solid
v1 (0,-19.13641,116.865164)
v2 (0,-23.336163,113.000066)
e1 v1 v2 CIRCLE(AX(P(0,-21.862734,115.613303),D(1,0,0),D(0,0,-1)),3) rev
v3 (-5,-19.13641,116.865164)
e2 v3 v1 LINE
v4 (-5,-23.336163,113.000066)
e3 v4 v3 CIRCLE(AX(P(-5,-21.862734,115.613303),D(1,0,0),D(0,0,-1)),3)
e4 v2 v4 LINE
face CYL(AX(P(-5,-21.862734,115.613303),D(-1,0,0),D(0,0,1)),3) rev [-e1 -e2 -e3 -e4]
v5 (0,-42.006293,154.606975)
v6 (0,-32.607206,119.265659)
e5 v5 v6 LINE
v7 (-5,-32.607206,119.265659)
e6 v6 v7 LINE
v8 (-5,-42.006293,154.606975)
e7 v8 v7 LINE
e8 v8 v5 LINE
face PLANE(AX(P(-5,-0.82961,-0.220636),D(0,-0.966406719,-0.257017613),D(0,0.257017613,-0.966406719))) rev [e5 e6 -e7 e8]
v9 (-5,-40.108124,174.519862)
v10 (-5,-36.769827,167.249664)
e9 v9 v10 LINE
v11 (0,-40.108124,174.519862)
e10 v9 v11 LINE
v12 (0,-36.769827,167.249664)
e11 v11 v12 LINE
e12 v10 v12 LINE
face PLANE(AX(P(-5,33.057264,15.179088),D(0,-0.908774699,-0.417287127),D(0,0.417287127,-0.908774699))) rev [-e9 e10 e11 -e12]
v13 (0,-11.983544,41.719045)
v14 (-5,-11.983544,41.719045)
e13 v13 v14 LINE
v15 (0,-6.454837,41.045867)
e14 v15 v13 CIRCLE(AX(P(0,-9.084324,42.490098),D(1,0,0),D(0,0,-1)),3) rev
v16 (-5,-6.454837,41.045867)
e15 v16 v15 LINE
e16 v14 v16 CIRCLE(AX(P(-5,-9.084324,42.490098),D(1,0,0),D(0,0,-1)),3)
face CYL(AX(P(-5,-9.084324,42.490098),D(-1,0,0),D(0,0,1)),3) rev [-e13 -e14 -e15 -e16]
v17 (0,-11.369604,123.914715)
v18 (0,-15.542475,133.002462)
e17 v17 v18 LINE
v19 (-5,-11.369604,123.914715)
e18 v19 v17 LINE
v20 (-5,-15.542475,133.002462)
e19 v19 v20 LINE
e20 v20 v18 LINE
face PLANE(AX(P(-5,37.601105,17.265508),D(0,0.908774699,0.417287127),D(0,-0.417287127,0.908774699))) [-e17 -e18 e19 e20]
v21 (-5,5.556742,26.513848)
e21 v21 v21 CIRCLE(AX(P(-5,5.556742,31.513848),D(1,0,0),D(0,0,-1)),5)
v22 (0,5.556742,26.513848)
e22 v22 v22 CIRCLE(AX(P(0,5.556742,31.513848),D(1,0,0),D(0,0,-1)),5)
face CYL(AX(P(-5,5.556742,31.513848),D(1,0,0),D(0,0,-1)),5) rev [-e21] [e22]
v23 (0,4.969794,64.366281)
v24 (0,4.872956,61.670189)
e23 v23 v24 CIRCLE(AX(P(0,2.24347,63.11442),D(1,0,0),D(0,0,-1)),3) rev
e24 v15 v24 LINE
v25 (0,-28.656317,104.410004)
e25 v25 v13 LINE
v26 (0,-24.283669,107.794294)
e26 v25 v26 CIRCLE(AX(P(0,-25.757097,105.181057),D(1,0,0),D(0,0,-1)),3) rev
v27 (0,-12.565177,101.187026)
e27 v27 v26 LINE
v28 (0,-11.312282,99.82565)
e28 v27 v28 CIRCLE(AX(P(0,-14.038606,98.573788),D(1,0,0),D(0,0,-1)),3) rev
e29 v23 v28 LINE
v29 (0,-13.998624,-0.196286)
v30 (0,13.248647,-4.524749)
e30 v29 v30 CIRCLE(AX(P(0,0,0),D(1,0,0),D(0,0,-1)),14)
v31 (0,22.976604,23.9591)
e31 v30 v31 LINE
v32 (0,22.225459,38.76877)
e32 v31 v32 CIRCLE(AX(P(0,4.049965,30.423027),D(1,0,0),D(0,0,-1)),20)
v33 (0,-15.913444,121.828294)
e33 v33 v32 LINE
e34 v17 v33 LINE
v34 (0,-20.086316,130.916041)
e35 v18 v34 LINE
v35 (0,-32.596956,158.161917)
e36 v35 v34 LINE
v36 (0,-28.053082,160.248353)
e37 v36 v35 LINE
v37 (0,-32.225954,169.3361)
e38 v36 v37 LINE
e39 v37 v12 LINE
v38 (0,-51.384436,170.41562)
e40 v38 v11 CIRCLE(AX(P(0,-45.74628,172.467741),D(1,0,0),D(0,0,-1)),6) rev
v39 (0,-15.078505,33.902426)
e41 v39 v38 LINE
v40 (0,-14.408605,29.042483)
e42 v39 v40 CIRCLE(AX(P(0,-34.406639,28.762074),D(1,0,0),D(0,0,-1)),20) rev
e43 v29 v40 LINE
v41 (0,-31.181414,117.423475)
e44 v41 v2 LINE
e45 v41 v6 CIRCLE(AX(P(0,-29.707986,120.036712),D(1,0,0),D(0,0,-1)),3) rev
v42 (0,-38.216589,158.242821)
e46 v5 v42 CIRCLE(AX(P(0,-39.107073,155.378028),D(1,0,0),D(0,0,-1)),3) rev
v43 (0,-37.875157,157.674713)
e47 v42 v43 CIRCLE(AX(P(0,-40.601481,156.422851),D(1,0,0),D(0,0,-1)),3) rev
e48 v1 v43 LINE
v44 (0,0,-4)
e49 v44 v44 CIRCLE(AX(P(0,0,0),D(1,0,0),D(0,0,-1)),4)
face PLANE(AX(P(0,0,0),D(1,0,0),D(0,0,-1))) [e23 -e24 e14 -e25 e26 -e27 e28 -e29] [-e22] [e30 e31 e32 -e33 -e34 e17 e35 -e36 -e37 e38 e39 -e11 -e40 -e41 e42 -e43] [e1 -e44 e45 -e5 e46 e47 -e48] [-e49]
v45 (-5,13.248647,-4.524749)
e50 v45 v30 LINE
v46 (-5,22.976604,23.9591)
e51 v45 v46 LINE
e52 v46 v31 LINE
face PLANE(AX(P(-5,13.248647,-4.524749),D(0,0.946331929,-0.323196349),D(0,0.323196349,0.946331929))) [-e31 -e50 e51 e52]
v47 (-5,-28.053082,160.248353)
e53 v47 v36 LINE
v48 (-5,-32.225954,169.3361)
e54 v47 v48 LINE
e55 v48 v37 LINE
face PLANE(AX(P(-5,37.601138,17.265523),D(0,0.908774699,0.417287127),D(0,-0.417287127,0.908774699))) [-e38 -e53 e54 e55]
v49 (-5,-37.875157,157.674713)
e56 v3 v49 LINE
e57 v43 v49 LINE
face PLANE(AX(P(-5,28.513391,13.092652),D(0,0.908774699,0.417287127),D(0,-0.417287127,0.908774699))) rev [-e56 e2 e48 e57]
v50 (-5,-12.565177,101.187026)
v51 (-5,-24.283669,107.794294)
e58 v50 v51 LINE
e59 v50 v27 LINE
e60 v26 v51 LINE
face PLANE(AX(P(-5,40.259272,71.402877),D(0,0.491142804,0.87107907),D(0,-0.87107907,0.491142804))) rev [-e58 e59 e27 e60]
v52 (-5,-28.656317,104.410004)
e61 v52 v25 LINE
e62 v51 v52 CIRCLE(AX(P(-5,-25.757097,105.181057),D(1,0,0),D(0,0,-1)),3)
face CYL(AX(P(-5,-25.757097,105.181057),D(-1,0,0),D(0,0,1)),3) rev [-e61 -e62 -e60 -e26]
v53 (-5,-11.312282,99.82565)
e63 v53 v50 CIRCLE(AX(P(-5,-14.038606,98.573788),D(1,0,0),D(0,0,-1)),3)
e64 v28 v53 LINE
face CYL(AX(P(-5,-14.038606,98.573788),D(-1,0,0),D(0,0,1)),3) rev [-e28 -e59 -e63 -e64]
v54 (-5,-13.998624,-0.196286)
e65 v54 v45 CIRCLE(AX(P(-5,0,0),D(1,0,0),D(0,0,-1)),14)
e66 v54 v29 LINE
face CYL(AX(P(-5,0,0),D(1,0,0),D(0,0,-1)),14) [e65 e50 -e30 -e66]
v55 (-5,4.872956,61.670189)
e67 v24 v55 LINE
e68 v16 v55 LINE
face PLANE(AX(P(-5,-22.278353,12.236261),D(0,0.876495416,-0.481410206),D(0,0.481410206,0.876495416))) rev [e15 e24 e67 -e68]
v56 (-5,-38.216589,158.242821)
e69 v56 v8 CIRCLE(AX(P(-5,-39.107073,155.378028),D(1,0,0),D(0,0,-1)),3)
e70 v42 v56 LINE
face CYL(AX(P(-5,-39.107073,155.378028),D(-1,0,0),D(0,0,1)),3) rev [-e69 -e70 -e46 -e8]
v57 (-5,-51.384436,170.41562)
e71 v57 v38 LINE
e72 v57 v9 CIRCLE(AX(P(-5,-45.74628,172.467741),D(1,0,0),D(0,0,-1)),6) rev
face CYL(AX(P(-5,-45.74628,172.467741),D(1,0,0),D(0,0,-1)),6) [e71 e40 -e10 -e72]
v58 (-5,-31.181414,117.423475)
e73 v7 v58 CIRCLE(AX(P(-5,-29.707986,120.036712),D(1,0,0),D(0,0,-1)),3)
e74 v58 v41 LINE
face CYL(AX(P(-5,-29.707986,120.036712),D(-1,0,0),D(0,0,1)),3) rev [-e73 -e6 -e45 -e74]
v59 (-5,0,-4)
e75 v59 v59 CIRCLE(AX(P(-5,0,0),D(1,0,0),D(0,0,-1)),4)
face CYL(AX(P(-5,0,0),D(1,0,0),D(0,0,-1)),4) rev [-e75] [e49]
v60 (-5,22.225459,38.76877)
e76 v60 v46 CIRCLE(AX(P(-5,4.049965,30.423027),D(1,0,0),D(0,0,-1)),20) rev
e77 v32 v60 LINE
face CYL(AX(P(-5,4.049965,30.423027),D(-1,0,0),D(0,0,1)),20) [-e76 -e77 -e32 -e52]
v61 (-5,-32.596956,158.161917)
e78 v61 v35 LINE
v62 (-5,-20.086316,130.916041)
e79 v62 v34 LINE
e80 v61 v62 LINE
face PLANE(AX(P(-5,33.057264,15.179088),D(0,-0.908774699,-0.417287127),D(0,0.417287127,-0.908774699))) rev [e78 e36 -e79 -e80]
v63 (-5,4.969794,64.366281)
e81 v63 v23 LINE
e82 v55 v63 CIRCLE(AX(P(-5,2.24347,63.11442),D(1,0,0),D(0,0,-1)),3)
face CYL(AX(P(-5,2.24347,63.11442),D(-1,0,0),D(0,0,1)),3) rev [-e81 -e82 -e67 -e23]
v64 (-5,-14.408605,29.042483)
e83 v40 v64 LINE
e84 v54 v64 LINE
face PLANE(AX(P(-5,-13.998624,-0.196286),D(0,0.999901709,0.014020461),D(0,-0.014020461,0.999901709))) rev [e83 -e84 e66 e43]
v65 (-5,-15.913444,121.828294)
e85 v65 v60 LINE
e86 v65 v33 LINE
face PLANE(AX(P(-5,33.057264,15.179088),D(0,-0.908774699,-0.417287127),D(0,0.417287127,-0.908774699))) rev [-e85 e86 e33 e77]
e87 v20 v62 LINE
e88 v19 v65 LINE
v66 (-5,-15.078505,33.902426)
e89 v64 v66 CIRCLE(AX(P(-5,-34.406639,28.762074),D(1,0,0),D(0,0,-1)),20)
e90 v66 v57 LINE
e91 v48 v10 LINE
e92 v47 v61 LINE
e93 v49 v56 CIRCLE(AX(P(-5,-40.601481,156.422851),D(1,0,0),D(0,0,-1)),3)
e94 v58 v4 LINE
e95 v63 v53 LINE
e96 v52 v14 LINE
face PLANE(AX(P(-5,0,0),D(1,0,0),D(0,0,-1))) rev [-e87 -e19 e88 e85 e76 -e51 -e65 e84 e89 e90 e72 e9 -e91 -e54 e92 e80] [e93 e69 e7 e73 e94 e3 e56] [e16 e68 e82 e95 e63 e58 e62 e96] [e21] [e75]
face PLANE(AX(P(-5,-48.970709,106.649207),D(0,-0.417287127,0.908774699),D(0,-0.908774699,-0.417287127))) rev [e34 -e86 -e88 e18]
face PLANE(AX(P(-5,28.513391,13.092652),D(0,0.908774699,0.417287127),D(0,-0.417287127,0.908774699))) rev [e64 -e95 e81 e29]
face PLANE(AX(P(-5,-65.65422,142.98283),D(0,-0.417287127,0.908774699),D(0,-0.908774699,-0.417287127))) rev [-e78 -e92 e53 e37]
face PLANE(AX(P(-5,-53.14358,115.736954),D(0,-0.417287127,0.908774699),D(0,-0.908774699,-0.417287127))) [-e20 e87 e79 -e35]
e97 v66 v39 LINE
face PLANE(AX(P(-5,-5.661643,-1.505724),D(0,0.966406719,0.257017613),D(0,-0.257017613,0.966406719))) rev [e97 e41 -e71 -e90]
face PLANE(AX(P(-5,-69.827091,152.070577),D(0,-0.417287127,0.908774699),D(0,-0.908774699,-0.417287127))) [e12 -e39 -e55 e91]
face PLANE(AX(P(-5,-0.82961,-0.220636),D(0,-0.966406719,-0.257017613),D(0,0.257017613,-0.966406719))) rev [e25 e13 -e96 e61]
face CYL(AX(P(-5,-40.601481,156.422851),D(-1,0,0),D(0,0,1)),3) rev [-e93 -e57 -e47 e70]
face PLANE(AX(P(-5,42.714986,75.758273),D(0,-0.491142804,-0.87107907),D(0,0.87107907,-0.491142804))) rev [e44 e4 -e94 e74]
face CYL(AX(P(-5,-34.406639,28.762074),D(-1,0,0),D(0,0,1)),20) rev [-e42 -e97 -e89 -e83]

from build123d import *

# Parameters (mm, degrees)
SKETCH1_R           = 4
SKETCH1_R_2         = 5
BOSS_EXTRUDE1_DEPTH = 5
FILLET3_R           = 20
FILLET10_R          = 3


with BuildPart() as part:
    # Sketch1 → Boss-Extrude1 (new body)
    # profile 1 of 3: a face of its own
    with BuildSketch(Plane.YZ):
        with BuildLine():
            Line((-14.443258315, 31.513848096), (-13.998623919, -0.196286448))
            ThreePointArc((-13.998623919, -0.196286448), (-2.196477435, -13.826622396), (13.248647006, -4.52474889))
            Line((13.248647006, -4.52474889), (25.556741685, 31.513848096))
            Line((25.556741685, 31.513848096), (-15.913444308, 121.828294459))
            Line((-15.913444308, 121.828294459), (-17.991906384, 126.354803013))
            Line((-17.991906384, 126.354803013), (-20.086315573, 130.916041451))
            Line((-20.086315573, 130.916041451), (-32.596955812, 158.161917487))
            Line((-32.596955812, 158.161917487), (-34.683391444, 162.705790984))
            Line((-34.683391444, 162.705790984), (-36.769827077, 167.24966448))
            Line((-36.769827077, 167.24966448), (-40.108124089, 174.519862074))
            ThreePointArc((-40.108124089, 174.519862074), (-47.798400673, 178.105896939), (-51.384435538, 170.415620354))
            Line((-51.384435538, 170.415620354), (-14.443258315, 31.513848096))
        make_face()
        with Locations(Location((0, 0, 0), (0, 0, 270))):
            Circle(SKETCH1_R, mode=Mode.SUBTRACT)
        with Locations(Location((5.556741685, 31.513848096, 0), (0, 0, 270))):
            Circle(SKETCH1_R_2, mode=Mode.SUBTRACT)
        Polygon((-10.059219018, 34.483430451), (-30.486505123, 111.291655193), (-11.718080145, 100.709404741), (5.599975549, 62.99386104), align=None, mode=Mode.SUBTRACT)
        Polygon((-38.215011053, 158.414852351), (-15.274502195, 108.454638594), (-32.282363467, 118.044225778), (-44.116299331, 162.540768328), align=None, mode=Mode.SUBTRACT)
    # profile 2 of 3: a face of its own
    with BuildSketch(Plane.YZ):
        Polygon((-17.991906384, 126.354803013), (-15.913444308, 121.828294459), (-11.369603993, 123.914714855), (-15.542475258, 133.002461848), (-20.086315573, 130.916041451), align=None)
    # profile 3 of 3: a face of its own
    with BuildSketch(Plane.YZ):
        Polygon((-32.22595358, 169.336100113), (-36.769827077, 167.24966448), (-34.683391444, 162.705790984), (-32.596955812, 158.161917487), (-28.053082315, 160.24835312), align=None)
    extrude(amount=-BOSS_EXTRUDE1_DEPTH)

    # Fillet3
    fillet3_edges = [part.edges().sort_by_distance(p)[0] for p in [
        (-2.5, 25.556741685, 31.513848096),
        (-2.5, -14.443258315, 31.513848096),
    ]]
    fillet(fillet3_edges, radius=FILLET3_R)

    # Fillet10
    # the kernel refuses this fillet: 3 mm, written as the material it adds along each edge
    with BuildSketch(Plane(origin=(0, -38.215011053, 158.414852351), x_dir=(0, 0.41728712651347166, -0.9087746992770703), z_dir=(-1, 0, 0))) as fillet10_piece_1:
        with BuildLine():
            CenterArc((FILLET10_R * 0.271478941521, FILLET10_R), FILLET10_R, 239.62294962, 30.37705038)
            Line((-FILLET10_R * 0.23420930525, FILLET10_R * 0.137283709973), (0, 0))
            Line((0, 0), (FILLET10_R * 0.271478941521, 0))
        make_face()
    extrude(amount=5)
    with BuildSketch(Plane(origin=(0, -32.282363467, 118.044225778), x_dir=(0, 0.8710790696902164, -0.49114280443433855), z_dir=(-1, 0, 0))) as fillet10_piece_2:
        with BuildLine():
            CenterArc((FILLET10_R * 0.421297147858, -FILLET10_R), FILLET10_R, 90, 45.691106369)
            Line((-FILLET10_R * 0.294287167004, -FILLET10_R * 0.301473630904), (0, 0))
            Line((0, 0), (FILLET10_R * 0.421297147858, 0))
        make_face()
    extrude(amount=5)
    with BuildSketch(Plane(origin=(0, -30.486505123, 111.291655193), x_dir=(0, 0.25701761253564515, -0.9664067191645953), z_dir=(-1, 0, 0))) as fillet10_piece_3:
        with BuildLine():
            CenterArc((FILLET10_R * 2.37362157585, -FILLET10_R), FILLET10_R, 90, 134.308893631)
            Line((FILLET10_R * 1.65803726099, -FILLET10_R * 1.6985263691), (0, 0))
            Line((0, 0), (FILLET10_R * 2.37362157585, 0))
        make_face()
    extrude(amount=5)
    with BuildSketch(Plane(origin=(0, -11.718080145, 100.709404741), x_dir=(0, -0.8710790696902125, 0.4911428044343457), z_dir=(-1, 0, 0))) as fillet10_piece_4:
        with BuildLine():
            CenterArc((FILLET10_R * 0.324156203472, -FILLET10_R), FILLET10_R, 90, 35.920846961)
            Line((-FILLET10_R * 0.262510846562, -FILLET10_R * 0.190171763641), (0, 0))
            Line((0, 0), (FILLET10_R * 0.324156203472, 0))
        make_face()
    extrude(amount=5)
    with BuildSketch(Plane(origin=(0, -10.059219018, 34.483430451), x_dir=(0, -0.2570176125356449, 0.9664067191645953), z_dir=(-1, 0, 0))) as fillet10_piece_5:
        with BuildLine():
            CenterArc((FILLET10_R * 2.49571060233, FILLET10_R), FILLET10_R, 133.670716463, 136.329283537)
            Line((FILLET10_R * 1.80519778573, FILLET10_R * 1.72332015741), (0, 0))
            Line((0, 0), (FILLET10_R * 2.49571060233, 0))
        make_face()
    extrude(amount=5)
    with BuildSketch(Plane(origin=(0, 5.599975549, 62.99386104), x_dir=(0, -0.41728712651347205, 0.9087746992770702), z_dir=(-1, 0, 0))) as fillet10_piece_6:
        with BuildLine():
            CenterArc((FILLET10_R * 0.503395718442, -FILLET10_R), FILLET10_R, 90, 53.440975871)
            Line((-FILLET10_R * 0.299847949894, -FILLET10_R * 0.404349423506), (0, 0))
            Line((0, 0), (FILLET10_R * 0.503395718442, 0))
        make_face()
    extrude(amount=5)
    with BuildSketch(Plane(origin=(0, -15.274502195, 108.454638594), x_dir=(0, -0.4172871265134709, 0.9087746992770708), z_dir=(-1, 0, 0))) as fillet10_piece_7:
        with BuildLine():
            CenterArc((FILLET10_R * 3.08493247789, -FILLET10_R), FILLET10_R, 90, 144.079153039)
            Line((FILLET10_R * 2.49826542786, -FILLET10_R * 1.80982823636), (0, 0))
            Line((0, 0), (FILLET10_R * 3.08493247789, 0))
        make_face()
    extrude(amount=5)
    with BuildSketch(Plane(origin=(0, -44.116299331, 162.540768328), x_dir=(0, 0.2570176125356455, -0.9664067191645951), z_dir=(-1, 0, 0))) as fillet10_piece_8:
        with BuildLine():
            CenterArc((FILLET10_R * 2.73652664972, -FILLET10_R), FILLET10_R, 90, 139.852690212)
            Line((FILLET10_R * 2.09177163516, -FILLET10_R * 1.76438927988), (0, 0))
            Line((0, 0), (FILLET10_R * 2.73652664972, 0))
        make_face()
    extrude(amount=5)


solid = part.part
